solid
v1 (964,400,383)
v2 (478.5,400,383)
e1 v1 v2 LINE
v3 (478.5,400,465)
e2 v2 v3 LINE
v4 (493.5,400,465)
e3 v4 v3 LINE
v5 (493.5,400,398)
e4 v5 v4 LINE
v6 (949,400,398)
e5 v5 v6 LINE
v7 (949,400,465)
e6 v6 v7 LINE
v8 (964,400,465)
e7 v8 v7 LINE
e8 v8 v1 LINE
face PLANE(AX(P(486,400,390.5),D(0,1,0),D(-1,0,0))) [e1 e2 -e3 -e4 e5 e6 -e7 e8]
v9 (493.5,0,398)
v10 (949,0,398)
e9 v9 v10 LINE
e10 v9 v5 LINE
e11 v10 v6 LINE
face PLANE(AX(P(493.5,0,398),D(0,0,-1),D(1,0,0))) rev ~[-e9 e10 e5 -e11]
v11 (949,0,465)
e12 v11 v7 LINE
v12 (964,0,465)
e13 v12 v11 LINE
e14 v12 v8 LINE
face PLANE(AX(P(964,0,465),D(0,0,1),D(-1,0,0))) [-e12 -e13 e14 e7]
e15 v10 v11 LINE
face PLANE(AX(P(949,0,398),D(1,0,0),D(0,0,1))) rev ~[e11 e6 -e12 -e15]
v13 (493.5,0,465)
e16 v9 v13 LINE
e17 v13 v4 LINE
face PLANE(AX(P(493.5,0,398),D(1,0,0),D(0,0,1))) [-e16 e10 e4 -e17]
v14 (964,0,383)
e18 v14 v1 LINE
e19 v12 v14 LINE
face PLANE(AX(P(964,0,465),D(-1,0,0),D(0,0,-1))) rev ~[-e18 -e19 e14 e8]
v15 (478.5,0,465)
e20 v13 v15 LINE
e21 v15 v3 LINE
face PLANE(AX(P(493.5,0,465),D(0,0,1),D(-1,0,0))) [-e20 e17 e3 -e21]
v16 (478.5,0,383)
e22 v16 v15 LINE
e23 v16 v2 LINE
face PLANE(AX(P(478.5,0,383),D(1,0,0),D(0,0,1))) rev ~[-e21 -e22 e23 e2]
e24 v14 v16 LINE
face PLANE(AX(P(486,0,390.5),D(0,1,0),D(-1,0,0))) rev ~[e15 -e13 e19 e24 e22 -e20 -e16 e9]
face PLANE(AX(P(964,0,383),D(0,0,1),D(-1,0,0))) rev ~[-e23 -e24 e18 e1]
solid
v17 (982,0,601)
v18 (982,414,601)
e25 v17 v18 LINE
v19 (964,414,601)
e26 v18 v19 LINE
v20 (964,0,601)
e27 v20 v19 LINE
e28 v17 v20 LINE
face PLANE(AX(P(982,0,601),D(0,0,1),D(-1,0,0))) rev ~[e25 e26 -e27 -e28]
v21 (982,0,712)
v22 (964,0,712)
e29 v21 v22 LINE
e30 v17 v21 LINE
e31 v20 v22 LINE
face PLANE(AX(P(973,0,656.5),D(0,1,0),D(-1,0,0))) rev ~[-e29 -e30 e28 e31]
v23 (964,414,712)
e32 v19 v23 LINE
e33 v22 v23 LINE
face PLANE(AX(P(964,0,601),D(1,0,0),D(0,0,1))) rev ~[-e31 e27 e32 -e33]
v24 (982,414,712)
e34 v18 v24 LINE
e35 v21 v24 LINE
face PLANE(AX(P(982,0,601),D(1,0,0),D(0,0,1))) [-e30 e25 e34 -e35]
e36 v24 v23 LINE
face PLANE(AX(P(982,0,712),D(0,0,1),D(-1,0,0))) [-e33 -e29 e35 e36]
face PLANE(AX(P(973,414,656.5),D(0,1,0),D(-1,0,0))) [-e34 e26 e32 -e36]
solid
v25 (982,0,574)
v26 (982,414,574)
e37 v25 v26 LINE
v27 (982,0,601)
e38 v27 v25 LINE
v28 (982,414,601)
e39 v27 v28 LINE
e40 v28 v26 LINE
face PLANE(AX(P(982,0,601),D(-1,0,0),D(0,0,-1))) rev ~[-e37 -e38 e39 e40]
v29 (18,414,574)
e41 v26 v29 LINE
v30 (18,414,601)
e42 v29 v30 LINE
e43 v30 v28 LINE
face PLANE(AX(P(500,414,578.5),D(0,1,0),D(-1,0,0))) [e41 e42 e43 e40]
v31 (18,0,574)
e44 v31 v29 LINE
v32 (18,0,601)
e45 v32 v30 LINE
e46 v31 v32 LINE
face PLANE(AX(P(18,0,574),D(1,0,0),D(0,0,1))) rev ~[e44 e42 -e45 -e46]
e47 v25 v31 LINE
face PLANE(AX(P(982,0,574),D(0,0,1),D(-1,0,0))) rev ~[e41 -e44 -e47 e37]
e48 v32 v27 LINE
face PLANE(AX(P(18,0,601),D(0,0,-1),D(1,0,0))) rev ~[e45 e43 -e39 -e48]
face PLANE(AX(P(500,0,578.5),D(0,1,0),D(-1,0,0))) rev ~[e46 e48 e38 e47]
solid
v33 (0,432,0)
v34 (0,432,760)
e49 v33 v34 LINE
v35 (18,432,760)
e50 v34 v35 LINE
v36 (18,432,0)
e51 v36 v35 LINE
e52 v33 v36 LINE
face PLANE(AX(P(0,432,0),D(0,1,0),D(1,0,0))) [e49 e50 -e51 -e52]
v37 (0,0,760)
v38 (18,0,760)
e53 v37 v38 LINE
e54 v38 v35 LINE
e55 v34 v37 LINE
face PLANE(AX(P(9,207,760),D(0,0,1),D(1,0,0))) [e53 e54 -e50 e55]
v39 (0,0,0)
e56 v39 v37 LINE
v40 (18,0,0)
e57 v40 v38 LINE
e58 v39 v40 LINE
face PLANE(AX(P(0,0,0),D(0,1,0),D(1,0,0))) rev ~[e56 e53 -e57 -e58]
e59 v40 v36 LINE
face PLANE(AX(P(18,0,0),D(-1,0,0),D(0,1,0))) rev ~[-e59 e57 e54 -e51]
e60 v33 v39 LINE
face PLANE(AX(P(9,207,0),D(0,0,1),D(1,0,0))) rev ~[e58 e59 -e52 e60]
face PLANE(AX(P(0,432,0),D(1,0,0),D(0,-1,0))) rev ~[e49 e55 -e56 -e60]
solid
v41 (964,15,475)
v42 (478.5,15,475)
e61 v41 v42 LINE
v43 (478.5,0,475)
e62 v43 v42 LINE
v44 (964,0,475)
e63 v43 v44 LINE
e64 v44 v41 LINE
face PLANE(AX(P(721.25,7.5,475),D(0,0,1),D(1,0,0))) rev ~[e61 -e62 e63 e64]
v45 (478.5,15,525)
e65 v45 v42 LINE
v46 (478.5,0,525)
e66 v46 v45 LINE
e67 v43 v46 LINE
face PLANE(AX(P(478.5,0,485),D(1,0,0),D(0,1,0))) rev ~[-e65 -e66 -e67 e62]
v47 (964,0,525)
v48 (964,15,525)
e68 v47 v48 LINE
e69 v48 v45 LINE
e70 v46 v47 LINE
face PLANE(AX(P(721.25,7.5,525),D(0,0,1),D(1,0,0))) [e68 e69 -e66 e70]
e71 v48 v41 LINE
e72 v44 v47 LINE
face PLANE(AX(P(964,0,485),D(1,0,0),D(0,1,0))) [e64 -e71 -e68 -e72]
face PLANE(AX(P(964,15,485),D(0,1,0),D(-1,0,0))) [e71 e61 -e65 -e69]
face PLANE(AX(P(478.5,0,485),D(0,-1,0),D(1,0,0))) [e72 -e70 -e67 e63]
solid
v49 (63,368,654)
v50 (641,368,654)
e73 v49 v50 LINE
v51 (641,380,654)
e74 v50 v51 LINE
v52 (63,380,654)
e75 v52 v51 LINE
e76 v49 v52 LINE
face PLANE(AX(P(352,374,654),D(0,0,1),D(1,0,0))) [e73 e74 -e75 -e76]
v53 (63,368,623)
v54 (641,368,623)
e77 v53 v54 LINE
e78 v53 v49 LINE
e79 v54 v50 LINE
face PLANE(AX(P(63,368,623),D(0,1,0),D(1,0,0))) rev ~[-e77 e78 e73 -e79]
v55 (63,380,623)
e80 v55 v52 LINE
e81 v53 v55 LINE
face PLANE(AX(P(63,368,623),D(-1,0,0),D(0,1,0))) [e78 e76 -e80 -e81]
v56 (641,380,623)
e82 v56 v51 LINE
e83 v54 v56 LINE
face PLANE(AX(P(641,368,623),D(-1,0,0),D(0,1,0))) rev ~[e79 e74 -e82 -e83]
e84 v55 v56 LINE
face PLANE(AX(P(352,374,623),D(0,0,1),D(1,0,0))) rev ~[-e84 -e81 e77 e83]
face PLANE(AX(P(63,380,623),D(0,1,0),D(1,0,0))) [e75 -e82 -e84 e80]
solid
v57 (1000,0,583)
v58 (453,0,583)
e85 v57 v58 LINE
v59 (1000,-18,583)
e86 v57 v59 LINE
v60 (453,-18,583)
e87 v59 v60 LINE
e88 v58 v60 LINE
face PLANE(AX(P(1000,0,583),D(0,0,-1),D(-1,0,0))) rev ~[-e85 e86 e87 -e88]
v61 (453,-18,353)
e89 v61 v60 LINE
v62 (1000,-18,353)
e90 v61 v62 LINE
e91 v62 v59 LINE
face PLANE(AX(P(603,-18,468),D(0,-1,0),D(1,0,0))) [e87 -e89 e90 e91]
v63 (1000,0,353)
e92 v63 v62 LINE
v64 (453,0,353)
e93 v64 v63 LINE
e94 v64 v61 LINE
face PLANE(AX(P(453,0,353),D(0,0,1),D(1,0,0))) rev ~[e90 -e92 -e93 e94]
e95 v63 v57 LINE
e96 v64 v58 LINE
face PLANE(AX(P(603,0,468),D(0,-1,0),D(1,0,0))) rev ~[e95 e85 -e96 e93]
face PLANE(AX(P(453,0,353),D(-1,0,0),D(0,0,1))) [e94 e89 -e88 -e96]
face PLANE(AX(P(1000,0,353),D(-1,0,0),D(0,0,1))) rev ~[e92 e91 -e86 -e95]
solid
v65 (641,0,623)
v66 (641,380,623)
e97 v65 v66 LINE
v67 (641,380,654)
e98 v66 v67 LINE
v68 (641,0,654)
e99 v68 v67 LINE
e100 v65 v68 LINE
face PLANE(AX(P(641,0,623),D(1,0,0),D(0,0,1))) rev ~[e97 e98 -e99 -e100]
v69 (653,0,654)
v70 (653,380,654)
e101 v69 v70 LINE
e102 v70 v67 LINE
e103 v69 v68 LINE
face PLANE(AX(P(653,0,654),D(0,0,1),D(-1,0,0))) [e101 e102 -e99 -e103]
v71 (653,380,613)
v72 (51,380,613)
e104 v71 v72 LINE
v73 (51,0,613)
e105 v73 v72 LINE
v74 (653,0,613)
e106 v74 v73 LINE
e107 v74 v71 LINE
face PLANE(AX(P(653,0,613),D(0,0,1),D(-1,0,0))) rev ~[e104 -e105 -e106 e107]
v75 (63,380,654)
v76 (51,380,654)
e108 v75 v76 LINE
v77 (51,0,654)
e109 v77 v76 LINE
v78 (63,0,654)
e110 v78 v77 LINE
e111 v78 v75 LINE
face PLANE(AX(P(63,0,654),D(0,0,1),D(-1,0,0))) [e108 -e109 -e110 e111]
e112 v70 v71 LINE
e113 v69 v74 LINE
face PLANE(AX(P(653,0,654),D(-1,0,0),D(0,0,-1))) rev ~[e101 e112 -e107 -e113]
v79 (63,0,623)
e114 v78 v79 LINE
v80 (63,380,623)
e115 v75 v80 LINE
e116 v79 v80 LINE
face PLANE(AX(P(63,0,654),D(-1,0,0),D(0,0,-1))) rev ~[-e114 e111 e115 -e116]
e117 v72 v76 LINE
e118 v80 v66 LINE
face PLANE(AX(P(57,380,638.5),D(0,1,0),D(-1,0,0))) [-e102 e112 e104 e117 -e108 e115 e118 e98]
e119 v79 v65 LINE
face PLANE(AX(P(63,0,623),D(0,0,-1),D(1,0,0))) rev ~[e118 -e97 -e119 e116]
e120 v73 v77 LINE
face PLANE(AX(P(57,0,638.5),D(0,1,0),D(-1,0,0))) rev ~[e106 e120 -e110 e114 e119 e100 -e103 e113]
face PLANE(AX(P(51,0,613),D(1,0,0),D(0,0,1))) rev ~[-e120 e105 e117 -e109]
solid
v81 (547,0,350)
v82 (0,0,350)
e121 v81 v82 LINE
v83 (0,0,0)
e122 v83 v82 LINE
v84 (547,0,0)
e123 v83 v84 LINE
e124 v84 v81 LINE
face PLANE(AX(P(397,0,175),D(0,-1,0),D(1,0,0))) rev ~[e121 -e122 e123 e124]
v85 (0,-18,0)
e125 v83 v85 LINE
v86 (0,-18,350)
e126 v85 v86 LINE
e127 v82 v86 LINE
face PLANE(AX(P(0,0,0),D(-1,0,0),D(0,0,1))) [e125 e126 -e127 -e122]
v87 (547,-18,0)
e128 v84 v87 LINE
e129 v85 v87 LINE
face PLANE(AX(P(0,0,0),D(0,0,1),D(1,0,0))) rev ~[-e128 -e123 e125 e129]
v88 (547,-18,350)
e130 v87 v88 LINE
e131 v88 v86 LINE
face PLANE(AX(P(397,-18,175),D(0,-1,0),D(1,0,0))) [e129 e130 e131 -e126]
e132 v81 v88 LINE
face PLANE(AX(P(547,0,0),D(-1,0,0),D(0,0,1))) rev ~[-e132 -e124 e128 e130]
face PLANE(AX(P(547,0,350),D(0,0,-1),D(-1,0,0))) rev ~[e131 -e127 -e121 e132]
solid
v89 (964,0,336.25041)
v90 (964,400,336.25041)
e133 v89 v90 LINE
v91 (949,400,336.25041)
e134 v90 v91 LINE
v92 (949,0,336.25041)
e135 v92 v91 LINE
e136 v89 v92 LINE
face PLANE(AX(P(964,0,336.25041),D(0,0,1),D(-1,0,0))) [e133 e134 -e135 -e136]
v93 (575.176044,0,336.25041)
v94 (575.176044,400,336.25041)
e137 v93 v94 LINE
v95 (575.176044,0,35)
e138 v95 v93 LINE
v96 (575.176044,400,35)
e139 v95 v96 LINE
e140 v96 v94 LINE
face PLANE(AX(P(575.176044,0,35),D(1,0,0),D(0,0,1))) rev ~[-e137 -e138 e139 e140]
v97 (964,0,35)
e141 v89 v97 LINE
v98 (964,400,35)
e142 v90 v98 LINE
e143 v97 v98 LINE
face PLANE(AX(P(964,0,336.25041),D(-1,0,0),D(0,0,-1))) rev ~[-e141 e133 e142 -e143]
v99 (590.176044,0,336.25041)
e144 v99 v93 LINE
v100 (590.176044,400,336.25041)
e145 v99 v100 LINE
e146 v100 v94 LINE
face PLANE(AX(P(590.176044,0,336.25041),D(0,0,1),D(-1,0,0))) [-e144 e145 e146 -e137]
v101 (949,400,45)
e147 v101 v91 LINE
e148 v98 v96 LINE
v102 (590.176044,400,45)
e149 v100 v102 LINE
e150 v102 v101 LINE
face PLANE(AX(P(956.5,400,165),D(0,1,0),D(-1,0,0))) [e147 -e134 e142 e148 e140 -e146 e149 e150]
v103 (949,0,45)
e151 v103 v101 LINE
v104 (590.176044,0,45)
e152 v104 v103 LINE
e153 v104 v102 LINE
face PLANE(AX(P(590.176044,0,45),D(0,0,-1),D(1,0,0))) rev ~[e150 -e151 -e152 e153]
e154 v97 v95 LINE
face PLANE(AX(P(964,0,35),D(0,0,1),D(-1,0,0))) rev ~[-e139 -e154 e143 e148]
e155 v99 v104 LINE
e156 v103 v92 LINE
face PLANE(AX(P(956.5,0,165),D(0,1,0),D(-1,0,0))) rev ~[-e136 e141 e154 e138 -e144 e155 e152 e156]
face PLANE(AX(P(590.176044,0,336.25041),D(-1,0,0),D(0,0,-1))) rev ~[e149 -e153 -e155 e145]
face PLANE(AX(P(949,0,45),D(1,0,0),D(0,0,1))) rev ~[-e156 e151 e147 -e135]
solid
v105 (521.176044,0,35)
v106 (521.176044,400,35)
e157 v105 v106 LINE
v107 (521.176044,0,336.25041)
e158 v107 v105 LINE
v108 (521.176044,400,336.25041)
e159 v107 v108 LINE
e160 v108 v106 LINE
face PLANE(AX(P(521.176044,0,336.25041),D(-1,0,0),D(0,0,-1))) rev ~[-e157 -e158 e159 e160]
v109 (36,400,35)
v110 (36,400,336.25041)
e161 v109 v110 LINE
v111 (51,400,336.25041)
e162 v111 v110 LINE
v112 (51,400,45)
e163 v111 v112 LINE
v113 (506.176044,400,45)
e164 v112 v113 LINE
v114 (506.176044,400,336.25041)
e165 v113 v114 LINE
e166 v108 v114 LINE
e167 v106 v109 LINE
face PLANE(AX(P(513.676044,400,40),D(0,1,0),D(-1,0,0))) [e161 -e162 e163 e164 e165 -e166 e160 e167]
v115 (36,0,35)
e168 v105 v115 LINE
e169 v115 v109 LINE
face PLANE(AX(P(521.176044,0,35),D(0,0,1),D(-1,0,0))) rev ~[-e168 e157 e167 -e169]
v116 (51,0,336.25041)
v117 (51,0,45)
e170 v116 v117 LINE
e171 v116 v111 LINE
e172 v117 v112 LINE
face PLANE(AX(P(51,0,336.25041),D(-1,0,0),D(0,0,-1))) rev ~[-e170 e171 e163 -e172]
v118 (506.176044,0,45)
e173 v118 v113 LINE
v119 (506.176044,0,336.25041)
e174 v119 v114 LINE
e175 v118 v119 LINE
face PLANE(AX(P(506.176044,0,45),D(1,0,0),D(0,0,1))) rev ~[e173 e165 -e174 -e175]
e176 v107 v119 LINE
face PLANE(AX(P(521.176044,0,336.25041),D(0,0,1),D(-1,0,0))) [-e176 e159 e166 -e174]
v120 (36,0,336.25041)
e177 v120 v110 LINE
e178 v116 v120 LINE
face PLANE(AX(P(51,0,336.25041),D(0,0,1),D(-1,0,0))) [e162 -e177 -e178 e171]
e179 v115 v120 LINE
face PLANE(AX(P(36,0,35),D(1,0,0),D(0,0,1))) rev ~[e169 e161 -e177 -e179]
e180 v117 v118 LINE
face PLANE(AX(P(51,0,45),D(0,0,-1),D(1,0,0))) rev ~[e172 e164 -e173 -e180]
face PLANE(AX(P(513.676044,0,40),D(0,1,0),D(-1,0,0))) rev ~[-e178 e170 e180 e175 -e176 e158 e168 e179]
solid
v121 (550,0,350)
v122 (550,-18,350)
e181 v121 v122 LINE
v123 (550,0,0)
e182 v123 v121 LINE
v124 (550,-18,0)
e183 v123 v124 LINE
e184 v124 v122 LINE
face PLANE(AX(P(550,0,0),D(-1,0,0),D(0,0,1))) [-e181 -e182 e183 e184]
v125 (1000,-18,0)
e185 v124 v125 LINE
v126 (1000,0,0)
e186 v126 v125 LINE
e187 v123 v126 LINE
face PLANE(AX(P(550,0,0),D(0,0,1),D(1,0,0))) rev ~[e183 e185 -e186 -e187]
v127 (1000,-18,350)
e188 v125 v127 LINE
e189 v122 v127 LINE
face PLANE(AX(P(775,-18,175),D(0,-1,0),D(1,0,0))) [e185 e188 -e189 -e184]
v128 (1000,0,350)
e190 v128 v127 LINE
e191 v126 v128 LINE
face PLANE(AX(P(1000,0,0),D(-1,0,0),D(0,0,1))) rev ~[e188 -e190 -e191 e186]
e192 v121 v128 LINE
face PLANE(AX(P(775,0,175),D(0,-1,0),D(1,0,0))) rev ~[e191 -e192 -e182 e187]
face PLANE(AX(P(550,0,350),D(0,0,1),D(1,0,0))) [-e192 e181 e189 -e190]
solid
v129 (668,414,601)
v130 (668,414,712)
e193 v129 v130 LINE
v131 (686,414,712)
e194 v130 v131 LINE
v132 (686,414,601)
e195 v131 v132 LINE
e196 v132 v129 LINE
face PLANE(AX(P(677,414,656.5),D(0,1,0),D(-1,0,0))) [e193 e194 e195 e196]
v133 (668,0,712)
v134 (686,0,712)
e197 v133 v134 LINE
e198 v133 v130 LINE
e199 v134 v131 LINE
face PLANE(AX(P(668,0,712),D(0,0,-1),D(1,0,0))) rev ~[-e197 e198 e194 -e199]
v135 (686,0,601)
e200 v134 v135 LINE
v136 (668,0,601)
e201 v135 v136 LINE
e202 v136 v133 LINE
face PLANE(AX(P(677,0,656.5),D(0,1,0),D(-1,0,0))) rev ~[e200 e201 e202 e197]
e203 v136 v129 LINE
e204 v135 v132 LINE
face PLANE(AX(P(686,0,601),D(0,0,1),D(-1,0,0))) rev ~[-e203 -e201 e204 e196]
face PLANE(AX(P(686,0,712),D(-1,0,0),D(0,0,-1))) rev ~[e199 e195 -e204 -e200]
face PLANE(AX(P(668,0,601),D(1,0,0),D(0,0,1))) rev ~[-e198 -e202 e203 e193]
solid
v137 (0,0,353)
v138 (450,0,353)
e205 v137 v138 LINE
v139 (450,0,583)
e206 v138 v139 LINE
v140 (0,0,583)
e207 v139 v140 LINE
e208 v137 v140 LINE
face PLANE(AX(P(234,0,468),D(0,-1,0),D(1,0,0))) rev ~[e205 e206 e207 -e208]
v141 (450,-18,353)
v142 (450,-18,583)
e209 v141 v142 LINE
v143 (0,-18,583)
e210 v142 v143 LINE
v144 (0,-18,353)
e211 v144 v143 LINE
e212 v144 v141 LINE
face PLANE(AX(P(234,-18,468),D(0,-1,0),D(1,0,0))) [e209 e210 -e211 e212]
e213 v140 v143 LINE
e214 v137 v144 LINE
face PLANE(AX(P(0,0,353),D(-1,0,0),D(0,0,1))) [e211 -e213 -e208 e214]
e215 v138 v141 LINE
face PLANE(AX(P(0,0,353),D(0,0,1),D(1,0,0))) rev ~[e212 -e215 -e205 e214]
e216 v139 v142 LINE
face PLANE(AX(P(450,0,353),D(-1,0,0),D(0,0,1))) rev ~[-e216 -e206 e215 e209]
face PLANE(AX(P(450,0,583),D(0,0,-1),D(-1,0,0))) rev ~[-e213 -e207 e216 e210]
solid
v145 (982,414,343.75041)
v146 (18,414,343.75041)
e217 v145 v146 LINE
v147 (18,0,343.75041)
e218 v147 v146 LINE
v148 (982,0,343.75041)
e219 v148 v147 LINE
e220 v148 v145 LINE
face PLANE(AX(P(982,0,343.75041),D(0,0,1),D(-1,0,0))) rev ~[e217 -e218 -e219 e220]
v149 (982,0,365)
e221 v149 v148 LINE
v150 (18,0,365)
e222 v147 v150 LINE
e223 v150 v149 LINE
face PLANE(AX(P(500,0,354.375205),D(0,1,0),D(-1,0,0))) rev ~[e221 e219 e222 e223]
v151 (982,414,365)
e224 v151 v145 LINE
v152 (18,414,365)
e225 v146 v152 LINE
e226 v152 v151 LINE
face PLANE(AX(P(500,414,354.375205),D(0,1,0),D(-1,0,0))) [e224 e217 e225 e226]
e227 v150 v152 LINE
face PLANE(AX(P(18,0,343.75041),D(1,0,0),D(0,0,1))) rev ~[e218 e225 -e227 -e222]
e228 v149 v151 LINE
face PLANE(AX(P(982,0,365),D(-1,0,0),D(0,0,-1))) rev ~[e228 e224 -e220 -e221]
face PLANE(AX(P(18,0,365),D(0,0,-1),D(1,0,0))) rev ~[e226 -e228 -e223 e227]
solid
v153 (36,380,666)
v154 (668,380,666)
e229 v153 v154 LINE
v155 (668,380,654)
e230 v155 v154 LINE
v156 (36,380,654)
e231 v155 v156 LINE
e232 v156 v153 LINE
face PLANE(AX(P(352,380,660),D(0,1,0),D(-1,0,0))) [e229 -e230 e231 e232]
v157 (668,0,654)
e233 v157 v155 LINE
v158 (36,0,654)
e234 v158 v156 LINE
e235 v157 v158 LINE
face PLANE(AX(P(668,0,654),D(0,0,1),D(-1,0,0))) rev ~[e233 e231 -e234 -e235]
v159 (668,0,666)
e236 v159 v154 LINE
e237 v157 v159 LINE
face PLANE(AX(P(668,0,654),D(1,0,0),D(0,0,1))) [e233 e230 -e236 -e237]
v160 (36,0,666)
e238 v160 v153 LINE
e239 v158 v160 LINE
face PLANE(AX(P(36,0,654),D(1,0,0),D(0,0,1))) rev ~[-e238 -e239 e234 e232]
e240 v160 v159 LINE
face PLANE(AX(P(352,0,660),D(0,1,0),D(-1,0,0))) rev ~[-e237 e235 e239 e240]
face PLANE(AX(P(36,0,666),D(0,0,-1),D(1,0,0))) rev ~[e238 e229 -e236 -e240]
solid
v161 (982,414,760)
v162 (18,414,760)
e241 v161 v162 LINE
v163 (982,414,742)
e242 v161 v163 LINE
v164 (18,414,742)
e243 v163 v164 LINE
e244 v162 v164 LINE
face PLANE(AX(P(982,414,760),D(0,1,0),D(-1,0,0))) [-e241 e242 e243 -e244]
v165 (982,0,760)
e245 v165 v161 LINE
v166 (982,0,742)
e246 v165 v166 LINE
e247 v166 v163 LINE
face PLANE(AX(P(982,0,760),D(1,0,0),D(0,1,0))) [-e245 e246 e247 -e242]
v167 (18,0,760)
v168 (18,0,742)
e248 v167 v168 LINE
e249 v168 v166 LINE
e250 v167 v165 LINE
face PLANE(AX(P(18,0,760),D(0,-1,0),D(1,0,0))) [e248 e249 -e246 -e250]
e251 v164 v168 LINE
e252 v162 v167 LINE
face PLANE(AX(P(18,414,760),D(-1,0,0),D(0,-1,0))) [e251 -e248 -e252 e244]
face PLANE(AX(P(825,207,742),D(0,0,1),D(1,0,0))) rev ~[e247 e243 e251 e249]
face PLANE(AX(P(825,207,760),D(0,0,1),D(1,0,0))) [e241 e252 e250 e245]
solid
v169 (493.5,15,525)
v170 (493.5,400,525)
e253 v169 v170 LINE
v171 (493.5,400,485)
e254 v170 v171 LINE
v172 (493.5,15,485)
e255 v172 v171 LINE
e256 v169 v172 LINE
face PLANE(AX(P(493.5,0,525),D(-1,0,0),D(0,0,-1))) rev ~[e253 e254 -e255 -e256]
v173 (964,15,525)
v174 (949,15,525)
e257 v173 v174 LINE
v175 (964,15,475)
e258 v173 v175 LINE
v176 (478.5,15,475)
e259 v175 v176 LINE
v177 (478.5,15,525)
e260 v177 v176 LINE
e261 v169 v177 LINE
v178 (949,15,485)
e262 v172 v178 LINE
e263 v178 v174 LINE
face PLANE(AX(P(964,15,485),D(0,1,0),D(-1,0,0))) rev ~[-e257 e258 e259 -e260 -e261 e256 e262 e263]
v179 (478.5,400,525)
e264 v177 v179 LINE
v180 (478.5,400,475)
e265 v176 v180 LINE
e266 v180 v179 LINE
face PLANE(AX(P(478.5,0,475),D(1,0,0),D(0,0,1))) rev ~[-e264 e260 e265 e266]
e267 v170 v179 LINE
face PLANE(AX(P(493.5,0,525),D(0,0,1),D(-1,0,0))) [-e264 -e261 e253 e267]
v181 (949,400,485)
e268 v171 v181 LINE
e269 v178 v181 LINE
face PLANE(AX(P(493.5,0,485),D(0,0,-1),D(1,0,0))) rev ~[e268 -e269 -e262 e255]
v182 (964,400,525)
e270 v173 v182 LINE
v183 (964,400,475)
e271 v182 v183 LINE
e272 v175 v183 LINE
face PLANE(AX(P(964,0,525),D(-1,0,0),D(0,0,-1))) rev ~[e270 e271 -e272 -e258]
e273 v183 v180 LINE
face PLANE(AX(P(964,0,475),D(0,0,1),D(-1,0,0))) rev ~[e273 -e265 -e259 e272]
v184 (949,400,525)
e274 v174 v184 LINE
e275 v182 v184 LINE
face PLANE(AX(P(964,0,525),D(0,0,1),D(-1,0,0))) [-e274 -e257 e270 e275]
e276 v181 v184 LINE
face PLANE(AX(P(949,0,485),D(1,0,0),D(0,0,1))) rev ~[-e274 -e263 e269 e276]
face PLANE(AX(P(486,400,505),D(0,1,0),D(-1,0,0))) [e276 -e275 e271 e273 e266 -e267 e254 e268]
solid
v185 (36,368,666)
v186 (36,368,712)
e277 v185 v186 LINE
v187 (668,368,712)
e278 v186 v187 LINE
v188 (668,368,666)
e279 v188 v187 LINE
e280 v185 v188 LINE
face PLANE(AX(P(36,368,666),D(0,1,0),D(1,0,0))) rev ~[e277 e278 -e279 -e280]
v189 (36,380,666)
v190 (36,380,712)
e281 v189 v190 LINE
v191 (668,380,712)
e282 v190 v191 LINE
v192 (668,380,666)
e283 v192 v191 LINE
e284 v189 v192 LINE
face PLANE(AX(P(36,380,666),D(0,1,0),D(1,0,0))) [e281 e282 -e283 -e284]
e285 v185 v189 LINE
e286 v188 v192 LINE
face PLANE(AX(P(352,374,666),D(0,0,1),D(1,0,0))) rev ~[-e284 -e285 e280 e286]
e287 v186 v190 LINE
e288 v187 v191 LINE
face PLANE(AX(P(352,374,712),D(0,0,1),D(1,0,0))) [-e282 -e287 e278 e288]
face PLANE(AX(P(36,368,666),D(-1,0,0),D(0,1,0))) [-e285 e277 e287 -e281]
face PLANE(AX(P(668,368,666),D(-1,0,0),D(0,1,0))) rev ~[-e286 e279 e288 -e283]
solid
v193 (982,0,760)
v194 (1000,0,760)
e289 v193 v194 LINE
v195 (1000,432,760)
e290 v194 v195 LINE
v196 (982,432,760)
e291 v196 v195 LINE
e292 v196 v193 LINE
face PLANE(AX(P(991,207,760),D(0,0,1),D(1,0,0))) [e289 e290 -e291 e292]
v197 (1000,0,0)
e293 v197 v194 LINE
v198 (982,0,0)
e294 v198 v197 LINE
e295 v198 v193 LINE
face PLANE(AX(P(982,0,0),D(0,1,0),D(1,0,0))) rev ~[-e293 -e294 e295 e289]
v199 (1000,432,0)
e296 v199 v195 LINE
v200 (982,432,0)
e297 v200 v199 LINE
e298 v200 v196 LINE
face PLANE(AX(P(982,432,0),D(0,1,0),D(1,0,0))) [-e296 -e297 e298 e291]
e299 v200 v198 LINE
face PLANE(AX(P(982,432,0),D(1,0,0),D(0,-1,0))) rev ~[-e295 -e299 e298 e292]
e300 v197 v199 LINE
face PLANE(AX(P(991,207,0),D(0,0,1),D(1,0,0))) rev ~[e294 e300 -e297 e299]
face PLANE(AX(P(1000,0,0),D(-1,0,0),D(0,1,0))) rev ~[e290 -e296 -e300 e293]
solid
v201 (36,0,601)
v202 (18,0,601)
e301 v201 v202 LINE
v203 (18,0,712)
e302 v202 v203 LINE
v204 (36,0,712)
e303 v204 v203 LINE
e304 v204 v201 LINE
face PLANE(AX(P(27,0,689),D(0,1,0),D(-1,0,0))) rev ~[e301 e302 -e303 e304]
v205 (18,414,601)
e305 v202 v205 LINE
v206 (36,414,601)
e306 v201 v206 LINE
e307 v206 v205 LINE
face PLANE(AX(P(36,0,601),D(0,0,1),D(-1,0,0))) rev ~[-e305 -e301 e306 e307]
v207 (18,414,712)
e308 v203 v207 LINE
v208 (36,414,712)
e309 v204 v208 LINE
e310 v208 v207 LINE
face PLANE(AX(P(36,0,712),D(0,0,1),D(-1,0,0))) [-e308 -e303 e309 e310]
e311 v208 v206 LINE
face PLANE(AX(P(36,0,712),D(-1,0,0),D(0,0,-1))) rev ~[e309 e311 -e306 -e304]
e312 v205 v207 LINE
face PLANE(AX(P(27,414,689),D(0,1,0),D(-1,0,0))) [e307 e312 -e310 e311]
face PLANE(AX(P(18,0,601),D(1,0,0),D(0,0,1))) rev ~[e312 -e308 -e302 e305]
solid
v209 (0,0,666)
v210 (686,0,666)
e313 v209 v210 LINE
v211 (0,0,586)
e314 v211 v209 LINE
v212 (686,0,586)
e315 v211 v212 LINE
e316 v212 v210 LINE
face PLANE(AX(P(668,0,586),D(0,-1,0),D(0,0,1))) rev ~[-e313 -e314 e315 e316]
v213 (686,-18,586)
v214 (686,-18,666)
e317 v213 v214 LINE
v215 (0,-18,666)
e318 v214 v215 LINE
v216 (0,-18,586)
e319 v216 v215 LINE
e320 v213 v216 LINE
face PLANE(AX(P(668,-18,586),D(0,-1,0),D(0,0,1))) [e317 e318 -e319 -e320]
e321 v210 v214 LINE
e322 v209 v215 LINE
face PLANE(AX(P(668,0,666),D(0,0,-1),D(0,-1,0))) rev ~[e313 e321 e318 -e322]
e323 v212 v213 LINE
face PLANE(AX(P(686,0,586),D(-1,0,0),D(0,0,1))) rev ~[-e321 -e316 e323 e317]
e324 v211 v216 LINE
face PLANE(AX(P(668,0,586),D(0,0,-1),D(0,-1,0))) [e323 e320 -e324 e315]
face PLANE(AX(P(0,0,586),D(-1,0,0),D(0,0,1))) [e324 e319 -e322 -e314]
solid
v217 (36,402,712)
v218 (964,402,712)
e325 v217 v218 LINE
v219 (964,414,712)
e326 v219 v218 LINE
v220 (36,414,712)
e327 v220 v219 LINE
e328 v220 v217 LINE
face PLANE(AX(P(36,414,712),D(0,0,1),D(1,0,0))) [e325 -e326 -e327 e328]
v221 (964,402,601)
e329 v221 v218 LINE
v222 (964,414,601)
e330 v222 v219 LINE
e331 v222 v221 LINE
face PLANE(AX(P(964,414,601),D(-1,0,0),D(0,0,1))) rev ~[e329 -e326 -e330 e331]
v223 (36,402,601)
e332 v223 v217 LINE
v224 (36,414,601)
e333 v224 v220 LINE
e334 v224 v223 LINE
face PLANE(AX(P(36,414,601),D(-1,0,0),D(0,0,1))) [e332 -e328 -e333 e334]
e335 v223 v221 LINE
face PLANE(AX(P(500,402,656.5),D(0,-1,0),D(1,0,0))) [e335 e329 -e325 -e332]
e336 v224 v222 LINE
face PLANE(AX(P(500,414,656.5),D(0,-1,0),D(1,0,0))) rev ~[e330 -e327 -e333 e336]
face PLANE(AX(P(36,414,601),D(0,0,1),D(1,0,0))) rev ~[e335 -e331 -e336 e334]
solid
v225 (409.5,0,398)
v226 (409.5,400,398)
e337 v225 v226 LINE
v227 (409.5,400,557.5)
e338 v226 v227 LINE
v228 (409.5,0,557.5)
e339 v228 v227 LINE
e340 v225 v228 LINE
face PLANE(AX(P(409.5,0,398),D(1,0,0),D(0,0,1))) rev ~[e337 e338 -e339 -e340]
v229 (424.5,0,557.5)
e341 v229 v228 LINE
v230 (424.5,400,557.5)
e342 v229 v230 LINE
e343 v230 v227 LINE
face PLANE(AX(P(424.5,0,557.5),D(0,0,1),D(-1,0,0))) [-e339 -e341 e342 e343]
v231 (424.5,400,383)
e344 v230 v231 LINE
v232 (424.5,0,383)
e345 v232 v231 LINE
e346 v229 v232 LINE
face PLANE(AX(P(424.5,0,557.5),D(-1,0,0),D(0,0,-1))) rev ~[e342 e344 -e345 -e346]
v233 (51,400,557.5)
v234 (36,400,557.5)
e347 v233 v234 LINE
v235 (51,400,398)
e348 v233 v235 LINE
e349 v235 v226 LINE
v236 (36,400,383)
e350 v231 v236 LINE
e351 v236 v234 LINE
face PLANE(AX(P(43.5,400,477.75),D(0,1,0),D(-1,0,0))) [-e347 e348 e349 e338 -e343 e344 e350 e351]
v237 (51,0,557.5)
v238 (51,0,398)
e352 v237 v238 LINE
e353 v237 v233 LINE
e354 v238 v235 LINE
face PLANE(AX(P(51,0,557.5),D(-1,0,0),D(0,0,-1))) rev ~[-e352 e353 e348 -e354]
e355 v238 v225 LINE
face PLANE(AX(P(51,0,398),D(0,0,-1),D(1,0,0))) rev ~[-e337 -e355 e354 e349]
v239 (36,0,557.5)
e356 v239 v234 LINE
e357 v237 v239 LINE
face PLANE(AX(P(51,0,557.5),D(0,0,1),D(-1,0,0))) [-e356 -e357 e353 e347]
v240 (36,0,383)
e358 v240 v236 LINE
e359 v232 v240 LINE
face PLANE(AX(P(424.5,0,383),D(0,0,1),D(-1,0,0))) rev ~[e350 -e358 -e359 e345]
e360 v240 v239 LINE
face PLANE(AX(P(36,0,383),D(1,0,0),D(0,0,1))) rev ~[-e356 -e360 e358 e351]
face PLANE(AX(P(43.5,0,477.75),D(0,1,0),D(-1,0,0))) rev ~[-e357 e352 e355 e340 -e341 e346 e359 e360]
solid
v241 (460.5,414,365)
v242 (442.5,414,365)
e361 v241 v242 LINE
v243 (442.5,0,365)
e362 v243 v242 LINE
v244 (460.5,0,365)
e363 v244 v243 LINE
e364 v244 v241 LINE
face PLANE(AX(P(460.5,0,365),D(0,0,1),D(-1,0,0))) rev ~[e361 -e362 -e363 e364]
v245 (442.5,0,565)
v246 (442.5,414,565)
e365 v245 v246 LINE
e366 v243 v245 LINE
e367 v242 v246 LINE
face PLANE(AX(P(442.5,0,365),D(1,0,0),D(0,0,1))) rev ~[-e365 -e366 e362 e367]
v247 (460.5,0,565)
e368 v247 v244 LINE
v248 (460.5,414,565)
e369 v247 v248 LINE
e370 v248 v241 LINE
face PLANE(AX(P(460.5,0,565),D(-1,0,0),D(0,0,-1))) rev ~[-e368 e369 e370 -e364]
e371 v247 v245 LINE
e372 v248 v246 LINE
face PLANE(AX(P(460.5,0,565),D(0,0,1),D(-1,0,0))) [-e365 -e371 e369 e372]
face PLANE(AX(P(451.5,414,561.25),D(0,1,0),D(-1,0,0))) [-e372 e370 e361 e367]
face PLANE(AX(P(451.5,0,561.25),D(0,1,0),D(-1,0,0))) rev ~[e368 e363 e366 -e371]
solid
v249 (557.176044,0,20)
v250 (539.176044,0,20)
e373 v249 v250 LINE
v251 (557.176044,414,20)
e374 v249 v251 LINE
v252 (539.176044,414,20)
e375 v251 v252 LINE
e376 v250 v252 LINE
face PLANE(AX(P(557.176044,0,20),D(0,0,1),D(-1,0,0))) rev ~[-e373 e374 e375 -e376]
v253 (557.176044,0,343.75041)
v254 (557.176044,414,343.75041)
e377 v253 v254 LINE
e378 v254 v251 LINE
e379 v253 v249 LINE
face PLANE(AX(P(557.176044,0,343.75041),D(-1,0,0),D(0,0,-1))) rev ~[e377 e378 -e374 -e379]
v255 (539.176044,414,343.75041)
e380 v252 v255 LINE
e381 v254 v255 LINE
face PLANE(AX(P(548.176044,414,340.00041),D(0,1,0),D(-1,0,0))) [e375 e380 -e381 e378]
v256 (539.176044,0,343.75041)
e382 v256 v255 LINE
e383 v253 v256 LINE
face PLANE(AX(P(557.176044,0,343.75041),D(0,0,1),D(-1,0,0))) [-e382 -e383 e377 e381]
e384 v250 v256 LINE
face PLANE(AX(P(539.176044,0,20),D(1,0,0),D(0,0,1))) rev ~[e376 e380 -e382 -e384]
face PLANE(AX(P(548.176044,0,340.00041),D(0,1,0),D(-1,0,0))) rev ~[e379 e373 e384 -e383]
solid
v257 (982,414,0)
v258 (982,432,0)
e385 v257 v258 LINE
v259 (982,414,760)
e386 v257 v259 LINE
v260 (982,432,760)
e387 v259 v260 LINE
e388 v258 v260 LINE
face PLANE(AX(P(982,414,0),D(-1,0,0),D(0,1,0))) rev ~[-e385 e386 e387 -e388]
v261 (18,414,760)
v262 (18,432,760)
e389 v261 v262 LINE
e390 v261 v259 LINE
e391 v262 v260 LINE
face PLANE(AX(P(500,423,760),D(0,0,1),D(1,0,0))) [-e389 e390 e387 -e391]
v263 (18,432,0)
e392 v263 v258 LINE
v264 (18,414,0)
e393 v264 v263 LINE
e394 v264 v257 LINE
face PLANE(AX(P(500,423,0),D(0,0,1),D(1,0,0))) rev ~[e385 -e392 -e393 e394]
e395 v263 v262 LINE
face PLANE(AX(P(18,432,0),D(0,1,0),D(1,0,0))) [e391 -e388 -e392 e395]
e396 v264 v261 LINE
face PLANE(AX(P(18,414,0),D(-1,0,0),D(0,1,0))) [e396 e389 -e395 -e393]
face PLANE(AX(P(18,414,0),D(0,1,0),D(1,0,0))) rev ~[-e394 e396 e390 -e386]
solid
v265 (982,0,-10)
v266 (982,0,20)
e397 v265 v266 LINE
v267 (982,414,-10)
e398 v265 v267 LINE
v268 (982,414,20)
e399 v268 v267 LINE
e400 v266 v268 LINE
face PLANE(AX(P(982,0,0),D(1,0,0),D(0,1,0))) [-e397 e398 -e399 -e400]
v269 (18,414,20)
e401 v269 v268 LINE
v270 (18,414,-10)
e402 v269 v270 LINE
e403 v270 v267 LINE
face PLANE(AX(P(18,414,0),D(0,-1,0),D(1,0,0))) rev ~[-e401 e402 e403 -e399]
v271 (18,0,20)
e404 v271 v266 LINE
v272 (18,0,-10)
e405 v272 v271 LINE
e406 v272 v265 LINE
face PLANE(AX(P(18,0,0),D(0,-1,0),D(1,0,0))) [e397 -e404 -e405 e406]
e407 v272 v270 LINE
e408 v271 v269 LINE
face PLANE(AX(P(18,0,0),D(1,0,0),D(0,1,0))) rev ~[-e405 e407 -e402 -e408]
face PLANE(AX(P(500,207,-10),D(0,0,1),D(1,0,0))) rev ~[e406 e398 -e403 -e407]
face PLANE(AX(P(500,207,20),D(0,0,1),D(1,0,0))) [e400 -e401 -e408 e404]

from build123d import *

# Parameters (mm, degrees)
F0_W           = 18
F0_H           = 414
F0_H_2         = 18
F1_DEPTH       = 760
F0_W_2         = 964
F2_DEPTH       = 760
F3_DEPTH       = 20
F3_DEPTH_BACK  = 10
F4_W           = 650
F4_H           = 300
F4_H_2         = 114
F5_DEPTH       = 18
F7_W           = 432
F7_H           = 230
F7_W_2         = 18
F8_DEPTH       = 18
F7_W_3         = 300
F7_W_4         = 244
F7_W_5         = 3
F7_W_6         = 450
F7_H_2         = 350
F7_W_7         = 226
F7_W_8         = 650
F7_H_3         = 80
F10_DEPTH      = 414
F9_W           = 278
F9_H           = 18
F9_W_2         = 18
F9_W_3         = 632
F9_H_2         = 15
F9_H_3         = 3
F11_DEPTH      = 414
F9_H_4         = 7.5
F9_H_5         = 159.5
F9_H_6         = 291.25041
F9_H_7         = 10
F9_H_8         = 111
F9_H_9         = 46
F9_H_10        = 65
F12_W          = 928
F12_H          = 111
F13_DEPTH      = 12
F9_W_4         = 15
F9_W_5         = 358.5
F14_DEPTH      = 400
F9_W_6         = 455.5
F9_H_11        = 67
F9_H_12        = 240
F9_W_7         = 358.8239558978
F9_H_13        = 51.25041
F9_W_8         = 455.1760441022
F9_H_14        = 40
F15_W          = 455.5
F15_H          = 15
F15_W_2        = 15
F16_DEPTH      = 40
F16_DEPTH_BACK = 10
F18_W          = 12
F18_H          = 31
F18_H_2        = 10
F18_W_2        = 578
F19_DEPTH      = 380
F20_W          = 578
F20_H          = 12
F21_DEPTH      = 31
F22_DEPTH      = 18
F18_W_3        = 15
F18_H_3        = 12
F23_DEPTH      = 380
F24_W          = 632
F24_H          = 12
F25_DEPTH      = 46


# Not quite as in the source:
# - a feature names something its author has since deleted; it is built from what else it names


with BuildPart() as f1:
    # F0 (on Top) → F1 (new body)
    with BuildSketch(Plane.XY):
        with Locations((9, 207)):
            Rectangle(F0_W, F0_H)
        with Locations((9, 423)):
            Rectangle(F0_W, F0_H_2)
    extrude(amount=F1_DEPTH)


with BuildPart() as f1b:
    # F0 (on Top) → F1, piece 2 (new body)
    with BuildSketch(Plane.XY):
        with Locations((991, 207)):
            Rectangle(F0_W, F0_H)
        with Locations((991, 423)):
            Rectangle(F0_W, F0_H_2)
    extrude(amount=F1_DEPTH)


with BuildPart() as f2:
    # F0 (on Top) → F2 (new body, through all)
    with BuildSketch(Plane.XY):
        with Locations((500, 423)):
            Rectangle(F0_W_2, F0_H_2)
    extrude(amount=F2_DEPTH)


with BuildPart() as f3:
    # F0 (on Top) → F3 (new body, two sides)
    with BuildSketch(Plane.XY) as f3_sk:
        with Locations((500, 207)):
            Rectangle(F0_W_2, F0_H)
    extrude(amount=F3_DEPTH)
    extrude(f3_sk.sketch, amount=-F3_DEPTH_BACK)


with BuildPart() as f5:
    # F4 (on face) → F5 (new body)
    with BuildSketch(Plane.XY.offset(760)):
        Polygon((982, 414), (668, 414), (668, 300), (668, 0), (982, 0), align=None)
        with Locations((343, 150)):
            Rectangle(F4_W, F4_H)
        with Locations((343, 357)):
            Rectangle(F4_W, F4_H_2)
    extrude(amount=-F5_DEPTH)


with BuildPart() as f5_1:
    # F6: moved
    add(f5.part.moved(Location((0, 0, -30))))


with BuildPart() as f8:
    # F7 (on face) → F8 (new body)
    with BuildSketch(Plane.XZ):
        with Locations((234, 468)):
            Rectangle(F7_W, F7_H)
        with Locations((9, 468)):
            Rectangle(F7_W_2, F7_H)
    extrude(amount=F8_DEPTH)


with BuildPart() as f8b:
    # F7 (on face) → F8, piece 2 (new body)
    with BuildSketch(Plane.XZ):
        with Locations((603, 468)):
            Rectangle(F7_W_3, F7_H)
        with Locations((878, 468)):
            Rectangle(F7_W_4, F7_H)
        with Locations((754.5, 468)):
            Rectangle(F7_W_5, F7_H)
    extrude(amount=F8_DEPTH)


with BuildPart() as f8c:
    # F7 (on face) → F8, piece 3 (new body)
    with BuildSketch(Plane.XZ):
        with Locations((775, 175)):
            Rectangle(F7_W_6, F7_H_2)
    extrude(amount=F8_DEPTH)


with BuildPart() as f8d:
    # F7 (on face) → F8, piece 4 (new body)
    with BuildSketch(Plane.XZ):
        with Locations((397, 175)):
            Rectangle(F7_W_3, F7_H_2)
        with Locations((131, 175)):
            Rectangle(F7_W_7, F7_H_2)
        with Locations((9, 175)):
            Rectangle(F7_W_2, F7_H_2)
        with Locations((245.5, 175)):
            Rectangle(F7_W_5, F7_H_2)
    extrude(amount=F8_DEPTH)


with BuildPart() as f8e:
    # F7 (on face) → F8, piece 5 (new body)
    with BuildSketch(Plane.XZ):
        with Locations((343, 626)):
            Rectangle(F7_W_8, F7_H_3)
        with Locations((9, 626)):
            Rectangle(F7_W_2, F7_H_3)
    extrude(amount=F8_DEPTH)

    # F22 (add, through all): a face of the model
    f22_faces = [f8e.faces().sort_by_distance(p)[0] for p in [
        (668, -9, 626),
    ]]
    extrude(f22_faces, amount=F22_DEPTH)


with BuildPart() as f10:
    # F9 (on face) → F10 (new body, through all)
    with BuildSketch(Plane(origin=(0, 0, 0), x_dir=(-1, 0, 0), z_dir=(0, 1, 0))):
        Polygon((-18, 365), (-36, 365), (-51, 365), (-442.5, 365), (-460.5, 365), (-964, 365), (-982, 365), (-982, 343.75041), (-964, 343.75041), (-949, 343.75041), (-590.1760441022, 343.75041), (-575.1760441022, 343.75041), (-557.1760441022, 343.75041), (-539.1760441022, 343.75041), (-521.1760441022, 343.75041), (-506.1760441022, 343.75041), (-51, 343.75041), (-36, 343.75041), (-18, 343.75041), align=None)
    extrude(amount=F10_DEPTH)


with BuildPart() as f10b:
    # F9 (on face) → F10, piece 2 (new body, through all)
    with BuildSketch(Plane(origin=(0, 0, 0), x_dir=(-1, 0, 0), z_dir=(0, 1, 0))):
        Polygon((-18, 574), (-18, 583), (-36, 583), (-668, 583), (-686, 583), (-964, 583), (-982, 583), (-982, 574), (-424.5, 574), (-409.5, 574), align=None)
        with Locations((-825, 592)):
            Rectangle(F9_W, F9_H)
        Polygon((-686, 583), (-668, 583), (-668, 586), (-668, 601), (-686, 601), align=None)
        with Locations((-973, 592)):
            Rectangle(F9_W_2, F9_H)
        with Locations((-352, 593.5)):
            Rectangle(F9_W_3, F9_H_2)
        with Locations((-27, 593.5)):
            Rectangle(F9_W_2, F9_H_2)
        with Locations((-27, 584.5)):
            Rectangle(F9_W_2, F9_H_3)
        with Locations((-352, 584.5)):
            Rectangle(F9_W_3, F9_H_3)
    extrude(amount=F10_DEPTH)


with BuildPart() as f11:
    # F9 (on face) → F11 (new body, through all)
    with BuildSketch(Plane(origin=(0, 0, 0), x_dir=(-1, 0, 0), z_dir=(0, 1, 0))):
        Polygon((-686, 712), (-686, 601), (-668, 601), (-668, 666), (-668, 712), align=None)
    extrude(amount=F11_DEPTH)


with BuildPart() as f11b:
    # F9 (on face) → F11, piece 2 (new body, through all)
    with BuildSketch(Plane(origin=(0, 0, 0), x_dir=(-1, 0, 0), z_dir=(0, 1, 0))):
        with Locations((-451.5, 561.25)):
            Rectangle(F9_W_2, F9_H_4)
        with Locations((-451.5, 477.75)):
            Rectangle(F9_W_2, F9_H_5)
        with Locations((-451.5, 390.5)):
            Rectangle(F9_W_2, F9_H_2)
        with Locations((-451.5, 374)):
            Rectangle(F9_W_2, F9_H)
    extrude(amount=F11_DEPTH)


with BuildPart() as f11c:
    # F9 (on face) → F11, piece 3 (new body, through all)
    with BuildSketch(Plane(origin=(0, 0, 0), x_dir=(-1, 0, 0), z_dir=(0, 1, 0))):
        with Locations((-548.1760441022, 340.00041)):
            Rectangle(F9_W_2, F9_H_4)
        with Locations((-548.1760441022, 190.625205)):
            Rectangle(F9_W_2, F9_H_6)
        with Locations((-548.1760441022, 40)):
            Rectangle(F9_W_2, F9_H_7)
        with Locations((-548.1760441022, 27.5)):
            Rectangle(F9_W_2, F9_H_2)
    extrude(amount=F11_DEPTH)


with BuildPart() as f11d:
    # F9 (on face) → F11, piece 4 (new body, through all)
    with BuildSketch(Plane(origin=(0, 0, 0), x_dir=(-1, 0, 0), z_dir=(0, 1, 0))):
        with Locations((-973, 656.5)):
            Rectangle(F9_W_2, F9_H_8)
    extrude(amount=F11_DEPTH)


with BuildPart() as f11e:
    # F9 (on face) → F11, piece 5 (new body, through all)
    with BuildSketch(Plane(origin=(0, 0, 0), x_dir=(-1, 0, 0), z_dir=(0, 1, 0))):
        with Locations((-27, 689)):
            Rectangle(F9_W_2, F9_H_9)
        with Locations((-27, 633.5)):
            Rectangle(F9_W_2, F9_H_10)
    extrude(amount=F11_DEPTH)


with BuildPart() as f13:
    # F12 (on face) → F13 (new body)
    with BuildSketch(Plane.XZ.offset(-414)):
        with Locations((500, 656.5)):
            Rectangle(F12_W, F12_H)
    extrude(amount=F13_DEPTH)


with BuildPart() as f14:
    # F9 (on face) → F14 (new body)
    with BuildSketch(Plane(origin=(0, 0, 0), x_dir=(-1, 0, 0), z_dir=(0, 1, 0))):
        with Locations((-43.5, 477.75)):
            Rectangle(F9_W_4, F9_H_5)
        with Locations((-43.5, 390.5)):
            Rectangle(F9_W_4, F9_H_2)
        with Locations((-230.25, 390.5)):
            Rectangle(F9_W_5, F9_H_2)
        with Locations((-417, 390.5)):
            Rectangle(F9_W_4, F9_H_2)
        with Locations((-417, 477.75)):
            Rectangle(F9_W_4, F9_H_5)
    extrude(amount=F14_DEPTH)


with BuildPart() as f14b:
    # F9 (on face) → F14, piece 2 (new body)
    with BuildSketch(Plane(origin=(0, 0, 0), x_dir=(-1, 0, 0), z_dir=(0, 1, 0))):
        with Locations((-486, 390.5)):
            Rectangle(F9_W_4, F9_H_2)
        with Locations((-721.25, 390.5)):
            Rectangle(F9_W_6, F9_H_2)
        with Locations((-956.5, 390.5)):
            Rectangle(F9_W_4, F9_H_2)
        with Locations((-956.5, 431.5)):
            Rectangle(F9_W_4, F9_H_11)
        with Locations((-486, 431.5)):
            Rectangle(F9_W_4, F9_H_11)
    extrude(amount=F14_DEPTH)


with BuildPart() as f14c:
    # F9 (on face) → F14, piece 3 (new body)
    with BuildSketch(Plane(origin=(0, 0, 0), x_dir=(-1, 0, 0), z_dir=(0, 1, 0))):
        with Locations((-956.5, 165)):
            Rectangle(F9_W_4, F9_H_12)
        with Locations((-956.5, 40)):
            Rectangle(F9_W_4, F9_H_7)
        with Locations((-769.5880220511, 40)):
            Rectangle(F9_W_7, F9_H_7)
        with Locations((-582.6760441022, 40)):
            Rectangle(F9_W_4, F9_H_7)
        with Locations((-582.6760441022, 165)):
            Rectangle(F9_W_4, F9_H_12)
        with Locations((-582.6760441022, 310.625205)):
            Rectangle(F9_W_4, F9_H_13)
        with Locations((-956.5, 310.625205)):
            Rectangle(F9_W_4, F9_H_13)
    extrude(amount=F14_DEPTH)


with BuildPart() as f14d:
    # F9 (on face) → F14, piece 4 (new body)
    with BuildSketch(Plane(origin=(0, 0, 0), x_dir=(-1, 0, 0), z_dir=(0, 1, 0))):
        with Locations((-513.6760441022, 40)):
            Rectangle(F9_W_4, F9_H_7)
        with Locations((-513.6760441022, 165)):
            Rectangle(F9_W_4, F9_H_12)
        with Locations((-278.5880220511, 40)):
            Rectangle(F9_W_8, F9_H_7)
        with Locations((-43.5, 40)):
            Rectangle(F9_W_4, F9_H_7)
        with Locations((-43.5, 165)):
            Rectangle(F9_W_4, F9_H_12)
        with Locations((-513.6760441022, 310.625205)):
            Rectangle(F9_W_4, F9_H_13)
        with Locations((-43.5, 310.625205)):
            Rectangle(F9_W_4, F9_H_13)
    extrude(amount=F14_DEPTH)


with BuildPart() as f14e:
    # F9 (on face) → F14, piece 5 (new body)
    with BuildSketch(Plane(origin=(0, 0, 0), x_dir=(-1, 0, 0), z_dir=(0, 1, 0))):
        with Locations((-486, 505)):
            Rectangle(F9_W_4, F9_H_14)
        with Locations((-486, 480)):
            Rectangle(F9_W_4, F9_H_7)
        Polygon((-575.1760441022, 485), (-949, 485), (-949, 475), (-575.1760441022, 475), (-493.5, 475), (-493.5, 485), align=None)
        with Locations((-956.5, 480)):
            Rectangle(F9_W_4, F9_H_7)
        with Locations((-956.5, 505)):
            Rectangle(F9_W_4, F9_H_14)
    extrude(amount=F14_DEPTH)


with BuildPart() as f16:
    # F15 (on face) → F16 (new body, two sides)
    with BuildSketch(Plane.XY.offset(485)) as f16_sk:
        with Locations((721.25, 7.5)):
            Rectangle(F15_W, F15_H)
        with Locations((486, 7.5)):
            Rectangle(F15_W_2, F15_H)
        with Locations((956.5, 7.5)):
            Rectangle(F15_W_2, F15_H)
    extrude(amount=F16_DEPTH)
    extrude(f16_sk.sketch, amount=-F16_DEPTH_BACK)


with BuildPart() as f14e_1:
    add(f14e.part)

    # F17: cut F16
    add(f16.part, mode=Mode.SUBTRACT)


with BuildPart() as f19:
    # F18 (on face) → F19 (new body)
    with BuildSketch(Plane(origin=(0, 0, 0), x_dir=(-1, 0, 0), z_dir=(0, 1, 0))):
        with Locations((-57, 638.5)):
            Rectangle(F18_W, F18_H)
        with Locations((-57, 618)):
            Rectangle(F18_W, F18_H_2)
        with Locations((-352, 618)):
            Rectangle(F18_W_2, F18_H_2)
        with Locations((-647, 618)):
            Rectangle(F18_W, F18_H_2)
        with Locations((-647, 638.5)):
            Rectangle(F18_W, F18_H)
    extrude(amount=F19_DEPTH)


with BuildPart() as f21:
    # F20 (on face) → F21 (new body, through all)
    with BuildSketch(Plane.XY.offset(623)):
        with Locations((352, 374)):
            Rectangle(F20_W, F20_H)
    extrude(amount=F21_DEPTH)


with BuildPart() as f23:
    # F18 (on face) → F23 (new body, through all)
    with BuildSketch(Plane(origin=(0, 0, 0), x_dir=(-1, 0, 0), z_dir=(0, 1, 0))):
        Polygon((-51, 654), (-51, 666), (-653, 666), (-653, 654), (-641, 654), (-63, 654), align=None)
        with Locations((-660.5, 660)):
            Rectangle(F18_W_3, F18_H_3)
        with Locations((-43.5, 660)):
            Rectangle(F18_W_3, F18_H_3)
    extrude(amount=F23_DEPTH)


with BuildPart() as f25:
    # F24 (on face) → F25 (new body, through all)
    with BuildSketch(Plane.XY.offset(666)):
        with Locations((352, 374)):
            Rectangle(F24_W, F24_H)
    extrude(amount=F25_DEPTH)


solid = Compound([f1.part, f1b.part, f2.part, f3.part, f5_1.part, f8.part, f8b.part, f8c.part, f8d.part, f8e.part, f10.part, f10b.part, f11.part, f11b.part, f11c.part, f11d.part, f11e.part, f13.part, f14.part, f14b.part, f14c.part, f14d.part, f16.part, f14e_1.part, f19.part, f21.part, f23.part, f25.part])
